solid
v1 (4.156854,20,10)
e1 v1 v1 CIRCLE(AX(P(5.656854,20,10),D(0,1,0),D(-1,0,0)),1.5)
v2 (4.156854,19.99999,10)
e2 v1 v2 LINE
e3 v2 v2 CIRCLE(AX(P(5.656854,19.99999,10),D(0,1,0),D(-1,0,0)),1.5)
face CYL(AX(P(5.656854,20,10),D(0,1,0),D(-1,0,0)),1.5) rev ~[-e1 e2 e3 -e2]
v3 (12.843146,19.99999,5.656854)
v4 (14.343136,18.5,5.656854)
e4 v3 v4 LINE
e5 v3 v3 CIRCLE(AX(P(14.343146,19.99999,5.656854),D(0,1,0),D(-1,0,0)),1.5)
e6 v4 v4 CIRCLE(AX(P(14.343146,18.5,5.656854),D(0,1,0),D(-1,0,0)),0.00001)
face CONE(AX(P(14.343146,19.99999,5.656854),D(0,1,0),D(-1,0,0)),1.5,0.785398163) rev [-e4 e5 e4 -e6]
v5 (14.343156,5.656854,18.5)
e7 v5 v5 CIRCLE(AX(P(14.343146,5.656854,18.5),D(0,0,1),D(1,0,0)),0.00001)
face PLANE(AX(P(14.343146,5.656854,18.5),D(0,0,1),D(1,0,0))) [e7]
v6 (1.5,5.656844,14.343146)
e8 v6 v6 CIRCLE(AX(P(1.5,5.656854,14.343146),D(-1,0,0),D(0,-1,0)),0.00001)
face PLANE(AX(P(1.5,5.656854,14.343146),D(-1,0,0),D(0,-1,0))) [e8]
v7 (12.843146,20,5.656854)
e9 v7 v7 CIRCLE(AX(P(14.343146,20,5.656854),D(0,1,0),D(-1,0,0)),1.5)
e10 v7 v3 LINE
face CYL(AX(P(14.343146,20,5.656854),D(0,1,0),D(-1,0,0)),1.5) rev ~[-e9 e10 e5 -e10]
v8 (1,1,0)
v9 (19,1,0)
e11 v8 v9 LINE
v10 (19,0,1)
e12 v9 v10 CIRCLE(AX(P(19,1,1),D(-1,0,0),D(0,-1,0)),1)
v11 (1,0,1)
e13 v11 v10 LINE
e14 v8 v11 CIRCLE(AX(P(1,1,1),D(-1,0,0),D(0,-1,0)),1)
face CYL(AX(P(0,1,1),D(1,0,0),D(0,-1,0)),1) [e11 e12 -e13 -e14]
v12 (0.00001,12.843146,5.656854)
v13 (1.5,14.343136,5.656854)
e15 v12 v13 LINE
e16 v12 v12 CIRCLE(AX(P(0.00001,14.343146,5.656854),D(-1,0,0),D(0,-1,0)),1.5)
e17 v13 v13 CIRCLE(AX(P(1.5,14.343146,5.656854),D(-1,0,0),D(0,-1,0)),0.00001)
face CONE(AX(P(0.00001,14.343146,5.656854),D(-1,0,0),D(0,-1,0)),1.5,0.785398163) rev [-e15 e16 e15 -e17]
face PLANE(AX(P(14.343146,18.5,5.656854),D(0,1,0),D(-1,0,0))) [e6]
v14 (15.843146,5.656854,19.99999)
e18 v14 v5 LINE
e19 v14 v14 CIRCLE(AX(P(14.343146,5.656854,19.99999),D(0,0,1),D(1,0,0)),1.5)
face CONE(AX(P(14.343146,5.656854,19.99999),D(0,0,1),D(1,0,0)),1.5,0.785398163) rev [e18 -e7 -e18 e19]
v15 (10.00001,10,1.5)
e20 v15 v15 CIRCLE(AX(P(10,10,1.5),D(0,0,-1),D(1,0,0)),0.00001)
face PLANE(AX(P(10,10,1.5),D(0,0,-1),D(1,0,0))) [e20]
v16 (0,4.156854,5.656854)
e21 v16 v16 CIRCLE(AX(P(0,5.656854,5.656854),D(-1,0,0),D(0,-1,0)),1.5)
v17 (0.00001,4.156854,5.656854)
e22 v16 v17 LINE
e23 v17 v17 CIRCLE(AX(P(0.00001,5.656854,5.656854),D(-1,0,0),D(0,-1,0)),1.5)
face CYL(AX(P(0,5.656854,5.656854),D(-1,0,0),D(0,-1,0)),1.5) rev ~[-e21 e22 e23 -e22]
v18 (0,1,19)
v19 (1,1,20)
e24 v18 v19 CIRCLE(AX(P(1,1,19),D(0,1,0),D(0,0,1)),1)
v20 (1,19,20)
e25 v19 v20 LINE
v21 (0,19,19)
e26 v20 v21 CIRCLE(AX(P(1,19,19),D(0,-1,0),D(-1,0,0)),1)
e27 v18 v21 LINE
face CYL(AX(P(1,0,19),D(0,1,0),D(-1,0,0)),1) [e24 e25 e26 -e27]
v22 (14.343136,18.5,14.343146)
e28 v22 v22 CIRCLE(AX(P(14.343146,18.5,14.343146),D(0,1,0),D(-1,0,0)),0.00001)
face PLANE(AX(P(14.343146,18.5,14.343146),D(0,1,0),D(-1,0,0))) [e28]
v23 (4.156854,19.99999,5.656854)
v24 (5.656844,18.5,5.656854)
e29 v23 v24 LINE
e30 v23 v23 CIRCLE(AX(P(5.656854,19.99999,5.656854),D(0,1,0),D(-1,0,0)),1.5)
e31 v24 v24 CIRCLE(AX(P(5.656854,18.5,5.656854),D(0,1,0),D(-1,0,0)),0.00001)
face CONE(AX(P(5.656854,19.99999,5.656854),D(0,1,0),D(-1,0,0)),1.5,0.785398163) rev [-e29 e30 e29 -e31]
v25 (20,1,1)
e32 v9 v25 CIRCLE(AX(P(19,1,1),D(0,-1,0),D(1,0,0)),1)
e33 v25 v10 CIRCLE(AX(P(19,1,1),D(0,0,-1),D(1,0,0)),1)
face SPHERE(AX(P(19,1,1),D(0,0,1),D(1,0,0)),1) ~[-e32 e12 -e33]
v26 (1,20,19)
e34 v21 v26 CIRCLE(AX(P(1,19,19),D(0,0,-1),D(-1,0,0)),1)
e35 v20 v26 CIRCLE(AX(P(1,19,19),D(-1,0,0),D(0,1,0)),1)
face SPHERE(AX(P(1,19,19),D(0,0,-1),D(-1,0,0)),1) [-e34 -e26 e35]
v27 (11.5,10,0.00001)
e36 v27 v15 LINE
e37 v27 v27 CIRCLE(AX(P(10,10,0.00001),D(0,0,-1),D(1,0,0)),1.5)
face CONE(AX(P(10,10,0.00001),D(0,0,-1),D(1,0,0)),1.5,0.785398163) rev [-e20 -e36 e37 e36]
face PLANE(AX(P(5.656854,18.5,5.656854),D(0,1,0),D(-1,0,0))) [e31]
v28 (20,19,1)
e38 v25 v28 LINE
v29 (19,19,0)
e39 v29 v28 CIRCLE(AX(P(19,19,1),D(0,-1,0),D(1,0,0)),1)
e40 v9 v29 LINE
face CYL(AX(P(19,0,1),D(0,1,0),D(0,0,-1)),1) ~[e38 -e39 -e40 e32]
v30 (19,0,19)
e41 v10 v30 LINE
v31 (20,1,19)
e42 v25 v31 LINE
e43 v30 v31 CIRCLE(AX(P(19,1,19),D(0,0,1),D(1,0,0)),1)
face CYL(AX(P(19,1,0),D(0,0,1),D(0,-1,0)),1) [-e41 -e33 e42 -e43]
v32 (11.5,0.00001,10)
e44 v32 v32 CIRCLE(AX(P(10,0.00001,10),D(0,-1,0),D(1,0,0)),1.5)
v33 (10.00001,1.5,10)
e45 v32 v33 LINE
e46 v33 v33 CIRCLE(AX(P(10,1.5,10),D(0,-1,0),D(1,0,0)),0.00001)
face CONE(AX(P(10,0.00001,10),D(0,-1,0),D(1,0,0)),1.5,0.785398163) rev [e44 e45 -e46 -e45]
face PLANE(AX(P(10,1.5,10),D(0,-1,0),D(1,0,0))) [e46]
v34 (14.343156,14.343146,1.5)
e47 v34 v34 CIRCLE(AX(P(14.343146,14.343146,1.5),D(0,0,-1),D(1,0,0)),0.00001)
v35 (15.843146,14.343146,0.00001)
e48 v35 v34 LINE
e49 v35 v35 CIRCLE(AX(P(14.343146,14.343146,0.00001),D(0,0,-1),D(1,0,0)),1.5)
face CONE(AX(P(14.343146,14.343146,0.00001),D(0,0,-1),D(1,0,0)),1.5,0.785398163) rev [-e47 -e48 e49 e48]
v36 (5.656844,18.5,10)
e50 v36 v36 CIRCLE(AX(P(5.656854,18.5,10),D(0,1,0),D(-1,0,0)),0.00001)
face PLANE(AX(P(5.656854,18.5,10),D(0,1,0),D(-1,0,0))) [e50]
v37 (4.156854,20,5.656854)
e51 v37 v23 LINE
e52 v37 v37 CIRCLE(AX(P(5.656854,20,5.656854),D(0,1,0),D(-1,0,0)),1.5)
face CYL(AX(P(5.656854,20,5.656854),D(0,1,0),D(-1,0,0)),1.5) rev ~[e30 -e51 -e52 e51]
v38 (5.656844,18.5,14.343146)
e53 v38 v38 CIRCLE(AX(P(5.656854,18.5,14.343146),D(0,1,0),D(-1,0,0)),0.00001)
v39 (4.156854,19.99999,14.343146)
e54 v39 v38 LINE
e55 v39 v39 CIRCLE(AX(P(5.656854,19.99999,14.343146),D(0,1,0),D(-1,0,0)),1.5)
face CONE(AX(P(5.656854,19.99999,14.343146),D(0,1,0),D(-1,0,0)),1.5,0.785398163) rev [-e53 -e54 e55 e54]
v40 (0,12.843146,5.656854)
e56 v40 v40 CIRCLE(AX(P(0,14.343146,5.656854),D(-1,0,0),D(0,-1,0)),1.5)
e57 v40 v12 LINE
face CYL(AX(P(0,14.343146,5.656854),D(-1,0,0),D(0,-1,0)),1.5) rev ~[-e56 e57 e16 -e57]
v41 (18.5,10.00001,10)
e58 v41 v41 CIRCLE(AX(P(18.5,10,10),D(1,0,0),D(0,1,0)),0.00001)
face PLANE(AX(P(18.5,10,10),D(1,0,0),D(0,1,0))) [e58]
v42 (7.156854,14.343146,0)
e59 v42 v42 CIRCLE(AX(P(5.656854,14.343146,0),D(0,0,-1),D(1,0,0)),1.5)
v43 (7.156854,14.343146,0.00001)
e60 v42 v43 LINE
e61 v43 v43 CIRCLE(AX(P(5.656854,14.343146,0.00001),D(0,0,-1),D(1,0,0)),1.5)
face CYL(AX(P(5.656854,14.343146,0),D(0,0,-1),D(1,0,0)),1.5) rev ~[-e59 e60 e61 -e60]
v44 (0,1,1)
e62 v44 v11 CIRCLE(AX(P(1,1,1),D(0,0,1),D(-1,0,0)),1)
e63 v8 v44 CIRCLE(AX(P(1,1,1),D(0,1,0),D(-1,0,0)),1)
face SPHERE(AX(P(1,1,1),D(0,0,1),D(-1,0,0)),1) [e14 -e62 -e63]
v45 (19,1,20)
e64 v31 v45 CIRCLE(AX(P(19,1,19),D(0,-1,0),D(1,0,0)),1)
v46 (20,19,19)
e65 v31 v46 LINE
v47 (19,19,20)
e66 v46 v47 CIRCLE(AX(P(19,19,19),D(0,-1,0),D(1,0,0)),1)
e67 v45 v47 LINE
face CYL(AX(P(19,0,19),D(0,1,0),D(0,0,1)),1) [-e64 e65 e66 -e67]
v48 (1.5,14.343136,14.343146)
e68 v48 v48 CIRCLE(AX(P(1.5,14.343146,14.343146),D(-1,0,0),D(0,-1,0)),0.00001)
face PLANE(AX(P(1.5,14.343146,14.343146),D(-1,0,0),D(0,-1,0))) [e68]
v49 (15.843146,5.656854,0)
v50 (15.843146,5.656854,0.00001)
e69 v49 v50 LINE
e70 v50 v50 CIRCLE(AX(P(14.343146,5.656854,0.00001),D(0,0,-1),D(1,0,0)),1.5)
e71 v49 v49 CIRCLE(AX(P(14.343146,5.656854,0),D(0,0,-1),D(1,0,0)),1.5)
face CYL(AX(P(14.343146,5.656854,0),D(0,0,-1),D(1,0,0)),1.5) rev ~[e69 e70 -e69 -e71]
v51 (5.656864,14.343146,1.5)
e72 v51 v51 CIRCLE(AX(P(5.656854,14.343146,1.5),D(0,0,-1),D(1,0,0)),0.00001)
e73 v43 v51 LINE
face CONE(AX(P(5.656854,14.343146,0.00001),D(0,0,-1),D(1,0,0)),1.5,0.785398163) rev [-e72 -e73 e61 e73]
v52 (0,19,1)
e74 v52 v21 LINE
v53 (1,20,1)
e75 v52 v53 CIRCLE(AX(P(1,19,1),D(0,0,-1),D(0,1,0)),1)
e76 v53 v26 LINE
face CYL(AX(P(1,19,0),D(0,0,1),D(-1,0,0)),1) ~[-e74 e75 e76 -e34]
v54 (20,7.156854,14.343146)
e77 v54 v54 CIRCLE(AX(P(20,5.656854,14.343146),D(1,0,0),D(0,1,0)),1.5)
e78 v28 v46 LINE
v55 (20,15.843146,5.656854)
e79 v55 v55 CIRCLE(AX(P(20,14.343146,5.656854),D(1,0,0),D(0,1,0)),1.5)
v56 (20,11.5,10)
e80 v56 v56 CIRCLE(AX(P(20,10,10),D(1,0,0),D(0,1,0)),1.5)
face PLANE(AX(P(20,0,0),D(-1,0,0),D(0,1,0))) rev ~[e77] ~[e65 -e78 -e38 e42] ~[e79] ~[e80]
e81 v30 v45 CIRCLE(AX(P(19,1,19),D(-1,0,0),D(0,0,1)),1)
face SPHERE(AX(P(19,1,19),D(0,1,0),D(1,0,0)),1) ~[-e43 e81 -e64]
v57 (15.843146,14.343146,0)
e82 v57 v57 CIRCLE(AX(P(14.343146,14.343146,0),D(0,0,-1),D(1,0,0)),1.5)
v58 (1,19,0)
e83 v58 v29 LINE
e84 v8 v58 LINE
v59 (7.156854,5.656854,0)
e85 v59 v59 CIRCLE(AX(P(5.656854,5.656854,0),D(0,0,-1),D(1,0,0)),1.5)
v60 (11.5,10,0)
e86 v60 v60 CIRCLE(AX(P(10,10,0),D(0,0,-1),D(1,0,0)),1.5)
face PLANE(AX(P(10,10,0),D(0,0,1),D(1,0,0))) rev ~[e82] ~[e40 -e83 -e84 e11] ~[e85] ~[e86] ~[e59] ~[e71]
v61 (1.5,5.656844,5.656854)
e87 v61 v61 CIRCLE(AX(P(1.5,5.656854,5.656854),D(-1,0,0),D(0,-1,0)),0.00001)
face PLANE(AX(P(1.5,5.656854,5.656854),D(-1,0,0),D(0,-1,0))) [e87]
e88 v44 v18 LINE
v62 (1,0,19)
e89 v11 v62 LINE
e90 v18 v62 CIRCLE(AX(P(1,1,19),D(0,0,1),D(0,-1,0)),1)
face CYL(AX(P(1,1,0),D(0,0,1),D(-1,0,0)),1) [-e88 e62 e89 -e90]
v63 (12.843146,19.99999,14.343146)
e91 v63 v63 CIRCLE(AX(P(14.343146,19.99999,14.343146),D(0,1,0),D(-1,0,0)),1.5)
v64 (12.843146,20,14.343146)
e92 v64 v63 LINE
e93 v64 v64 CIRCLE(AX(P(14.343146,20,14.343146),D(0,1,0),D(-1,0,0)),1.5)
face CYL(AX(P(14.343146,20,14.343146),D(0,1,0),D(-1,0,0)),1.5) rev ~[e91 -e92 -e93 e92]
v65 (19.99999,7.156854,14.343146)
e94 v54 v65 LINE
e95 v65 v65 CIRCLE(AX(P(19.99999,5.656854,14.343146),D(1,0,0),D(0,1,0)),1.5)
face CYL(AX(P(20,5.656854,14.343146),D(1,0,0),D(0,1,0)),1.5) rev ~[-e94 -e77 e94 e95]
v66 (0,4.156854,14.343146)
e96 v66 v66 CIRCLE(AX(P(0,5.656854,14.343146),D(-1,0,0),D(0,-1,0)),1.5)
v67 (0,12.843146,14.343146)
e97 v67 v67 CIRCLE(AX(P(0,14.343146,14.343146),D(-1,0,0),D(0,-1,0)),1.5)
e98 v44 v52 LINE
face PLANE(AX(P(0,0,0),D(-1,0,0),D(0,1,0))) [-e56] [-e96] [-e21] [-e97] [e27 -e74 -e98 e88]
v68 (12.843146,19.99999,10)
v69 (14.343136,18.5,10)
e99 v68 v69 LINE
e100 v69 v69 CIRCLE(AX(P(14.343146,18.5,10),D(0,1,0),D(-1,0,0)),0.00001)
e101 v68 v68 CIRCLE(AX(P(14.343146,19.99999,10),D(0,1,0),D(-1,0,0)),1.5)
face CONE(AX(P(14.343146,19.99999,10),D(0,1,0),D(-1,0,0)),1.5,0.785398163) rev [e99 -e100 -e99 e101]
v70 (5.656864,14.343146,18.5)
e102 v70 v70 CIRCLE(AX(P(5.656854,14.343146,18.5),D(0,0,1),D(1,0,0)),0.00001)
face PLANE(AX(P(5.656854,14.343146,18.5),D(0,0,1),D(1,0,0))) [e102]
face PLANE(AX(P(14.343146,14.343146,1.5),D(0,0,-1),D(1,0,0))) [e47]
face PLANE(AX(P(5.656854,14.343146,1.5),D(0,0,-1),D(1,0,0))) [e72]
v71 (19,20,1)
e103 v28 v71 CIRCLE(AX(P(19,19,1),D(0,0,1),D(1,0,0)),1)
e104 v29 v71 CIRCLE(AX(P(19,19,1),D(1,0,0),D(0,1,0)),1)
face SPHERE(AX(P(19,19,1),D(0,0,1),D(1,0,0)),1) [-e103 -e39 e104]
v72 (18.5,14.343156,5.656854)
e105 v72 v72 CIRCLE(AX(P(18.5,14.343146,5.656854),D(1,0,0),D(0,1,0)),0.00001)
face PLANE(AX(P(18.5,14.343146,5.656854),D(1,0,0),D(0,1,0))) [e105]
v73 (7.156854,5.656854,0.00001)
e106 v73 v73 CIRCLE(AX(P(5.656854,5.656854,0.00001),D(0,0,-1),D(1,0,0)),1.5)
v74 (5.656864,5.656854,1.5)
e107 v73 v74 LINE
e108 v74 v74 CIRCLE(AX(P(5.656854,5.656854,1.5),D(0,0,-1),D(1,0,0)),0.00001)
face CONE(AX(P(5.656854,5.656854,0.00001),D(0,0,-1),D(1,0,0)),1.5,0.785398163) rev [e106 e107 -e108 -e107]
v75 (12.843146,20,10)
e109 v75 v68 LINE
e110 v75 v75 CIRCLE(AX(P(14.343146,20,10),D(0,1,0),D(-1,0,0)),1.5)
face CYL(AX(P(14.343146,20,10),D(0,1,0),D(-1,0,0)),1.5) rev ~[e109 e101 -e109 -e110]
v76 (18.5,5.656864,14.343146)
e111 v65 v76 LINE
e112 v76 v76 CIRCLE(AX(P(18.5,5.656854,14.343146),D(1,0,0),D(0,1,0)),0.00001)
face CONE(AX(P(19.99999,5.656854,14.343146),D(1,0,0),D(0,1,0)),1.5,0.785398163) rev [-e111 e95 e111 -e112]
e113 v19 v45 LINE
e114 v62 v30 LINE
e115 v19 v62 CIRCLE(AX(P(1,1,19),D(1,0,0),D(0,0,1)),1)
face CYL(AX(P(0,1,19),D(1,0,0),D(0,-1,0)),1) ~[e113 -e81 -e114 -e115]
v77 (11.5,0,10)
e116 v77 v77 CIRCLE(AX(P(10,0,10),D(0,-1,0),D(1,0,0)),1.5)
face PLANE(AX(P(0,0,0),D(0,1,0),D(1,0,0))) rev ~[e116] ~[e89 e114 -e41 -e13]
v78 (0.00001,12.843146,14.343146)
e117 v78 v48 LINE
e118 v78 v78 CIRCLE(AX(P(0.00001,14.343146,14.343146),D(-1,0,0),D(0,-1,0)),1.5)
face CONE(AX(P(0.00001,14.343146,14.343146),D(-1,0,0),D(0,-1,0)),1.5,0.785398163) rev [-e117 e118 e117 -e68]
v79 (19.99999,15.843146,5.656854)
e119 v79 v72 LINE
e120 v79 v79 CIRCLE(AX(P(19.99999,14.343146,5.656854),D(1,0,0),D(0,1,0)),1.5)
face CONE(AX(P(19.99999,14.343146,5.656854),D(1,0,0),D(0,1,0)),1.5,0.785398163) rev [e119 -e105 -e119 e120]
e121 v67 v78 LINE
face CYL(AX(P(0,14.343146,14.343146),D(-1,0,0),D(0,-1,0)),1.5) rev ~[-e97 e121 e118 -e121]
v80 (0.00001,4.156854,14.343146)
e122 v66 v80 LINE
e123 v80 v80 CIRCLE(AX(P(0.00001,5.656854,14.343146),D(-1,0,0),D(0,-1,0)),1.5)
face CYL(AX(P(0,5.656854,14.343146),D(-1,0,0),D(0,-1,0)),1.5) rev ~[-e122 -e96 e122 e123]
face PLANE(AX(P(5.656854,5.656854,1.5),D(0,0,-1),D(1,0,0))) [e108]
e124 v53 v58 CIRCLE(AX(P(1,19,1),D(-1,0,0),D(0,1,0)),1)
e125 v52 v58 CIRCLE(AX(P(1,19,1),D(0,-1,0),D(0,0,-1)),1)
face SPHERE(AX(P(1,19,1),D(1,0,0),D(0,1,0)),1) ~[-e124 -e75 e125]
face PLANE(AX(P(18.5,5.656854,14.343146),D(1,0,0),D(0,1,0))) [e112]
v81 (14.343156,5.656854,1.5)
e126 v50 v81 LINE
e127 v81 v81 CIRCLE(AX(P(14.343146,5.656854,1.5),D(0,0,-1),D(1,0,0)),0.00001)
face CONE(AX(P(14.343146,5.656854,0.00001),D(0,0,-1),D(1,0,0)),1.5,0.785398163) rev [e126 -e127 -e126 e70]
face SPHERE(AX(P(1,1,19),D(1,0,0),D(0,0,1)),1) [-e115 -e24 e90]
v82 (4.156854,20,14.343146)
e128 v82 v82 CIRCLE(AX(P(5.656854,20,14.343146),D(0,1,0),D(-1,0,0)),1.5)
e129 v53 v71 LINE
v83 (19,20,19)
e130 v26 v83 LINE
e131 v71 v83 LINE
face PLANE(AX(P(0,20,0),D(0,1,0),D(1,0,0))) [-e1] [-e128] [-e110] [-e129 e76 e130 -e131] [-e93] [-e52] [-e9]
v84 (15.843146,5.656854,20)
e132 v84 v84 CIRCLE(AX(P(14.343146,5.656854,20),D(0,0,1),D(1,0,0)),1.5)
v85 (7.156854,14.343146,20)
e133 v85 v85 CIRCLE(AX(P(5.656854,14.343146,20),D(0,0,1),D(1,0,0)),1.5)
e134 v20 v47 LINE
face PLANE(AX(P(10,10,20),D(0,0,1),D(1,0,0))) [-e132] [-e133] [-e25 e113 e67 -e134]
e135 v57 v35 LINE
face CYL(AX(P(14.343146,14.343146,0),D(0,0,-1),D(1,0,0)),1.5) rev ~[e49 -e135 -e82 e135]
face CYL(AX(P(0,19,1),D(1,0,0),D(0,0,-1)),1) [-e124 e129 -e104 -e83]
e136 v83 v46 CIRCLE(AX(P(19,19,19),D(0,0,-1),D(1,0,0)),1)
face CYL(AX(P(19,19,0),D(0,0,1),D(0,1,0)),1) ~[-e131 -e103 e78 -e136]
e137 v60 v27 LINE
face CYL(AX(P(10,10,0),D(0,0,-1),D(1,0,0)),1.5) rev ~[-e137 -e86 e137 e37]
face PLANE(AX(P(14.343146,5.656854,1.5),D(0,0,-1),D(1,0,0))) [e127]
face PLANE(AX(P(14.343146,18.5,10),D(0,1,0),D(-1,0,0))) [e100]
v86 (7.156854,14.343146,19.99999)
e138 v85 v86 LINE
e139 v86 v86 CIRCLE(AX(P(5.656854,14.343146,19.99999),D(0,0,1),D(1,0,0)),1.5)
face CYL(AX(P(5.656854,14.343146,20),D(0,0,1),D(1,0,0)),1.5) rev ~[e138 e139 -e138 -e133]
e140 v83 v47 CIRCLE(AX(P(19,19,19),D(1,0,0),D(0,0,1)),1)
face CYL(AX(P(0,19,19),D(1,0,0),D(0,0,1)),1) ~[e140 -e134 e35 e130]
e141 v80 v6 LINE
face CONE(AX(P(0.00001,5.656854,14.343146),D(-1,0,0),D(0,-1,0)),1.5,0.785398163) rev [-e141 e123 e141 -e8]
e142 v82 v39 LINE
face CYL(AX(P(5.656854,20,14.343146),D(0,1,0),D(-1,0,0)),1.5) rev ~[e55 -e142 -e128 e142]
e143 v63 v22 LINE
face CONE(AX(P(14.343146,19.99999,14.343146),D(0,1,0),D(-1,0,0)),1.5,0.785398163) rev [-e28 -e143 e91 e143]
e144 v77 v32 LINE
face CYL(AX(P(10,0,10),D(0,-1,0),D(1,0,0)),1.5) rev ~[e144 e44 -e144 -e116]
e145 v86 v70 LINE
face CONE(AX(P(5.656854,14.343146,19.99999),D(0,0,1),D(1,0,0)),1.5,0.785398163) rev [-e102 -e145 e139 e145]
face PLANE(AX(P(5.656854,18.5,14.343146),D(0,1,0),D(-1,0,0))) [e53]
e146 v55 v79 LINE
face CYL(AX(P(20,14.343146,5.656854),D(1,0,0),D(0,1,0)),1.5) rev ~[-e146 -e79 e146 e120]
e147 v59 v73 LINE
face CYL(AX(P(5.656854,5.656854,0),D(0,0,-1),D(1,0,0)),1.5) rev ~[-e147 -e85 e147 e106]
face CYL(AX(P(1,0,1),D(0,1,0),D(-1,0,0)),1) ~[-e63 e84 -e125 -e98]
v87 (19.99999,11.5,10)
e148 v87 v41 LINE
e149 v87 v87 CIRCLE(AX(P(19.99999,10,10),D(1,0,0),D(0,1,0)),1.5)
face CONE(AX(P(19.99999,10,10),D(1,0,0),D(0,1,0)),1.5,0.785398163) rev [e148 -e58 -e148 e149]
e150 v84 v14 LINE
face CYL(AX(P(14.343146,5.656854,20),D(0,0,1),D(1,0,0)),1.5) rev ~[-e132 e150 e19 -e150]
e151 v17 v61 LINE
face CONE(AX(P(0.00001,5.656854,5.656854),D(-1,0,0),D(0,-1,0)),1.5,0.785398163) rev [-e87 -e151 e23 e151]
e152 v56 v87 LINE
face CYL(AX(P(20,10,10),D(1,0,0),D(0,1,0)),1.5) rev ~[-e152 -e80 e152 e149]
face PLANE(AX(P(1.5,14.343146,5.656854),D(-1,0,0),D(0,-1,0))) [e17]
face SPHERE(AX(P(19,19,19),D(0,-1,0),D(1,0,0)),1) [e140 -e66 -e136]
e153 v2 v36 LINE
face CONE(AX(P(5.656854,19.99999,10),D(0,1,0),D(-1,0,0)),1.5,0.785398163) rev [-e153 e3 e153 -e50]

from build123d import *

# Parameters (mm, degrees)
F0_W      = 20
F0_H      = 20
F1_DEPTH  = 20
F2_R      = 1.5
F3_DEPTH  = 1.5
F4_R      = 1.5
F5_DEPTH  = 1.5
F6_R      = 1.5
F7_DEPTH  = 1.5
F8_R      = 1.5
F9_DEPTH  = 1.5
F10_R     = 1.5
F11_DEPTH = 1.5
F12_R     = 1.5
F13_DEPTH = 1.5
F14_R     = 1
F15_SIZE  = 1.49999


# Not quite as in the source:
# - a fillet or chamfer is up to 0.001 mm smaller than in the source, because OpenCascade refuses the exact size


with BuildPart() as f1:
    # F0 (on Top) → F1 (new body)
    with BuildSketch(Plane.XY):
        with Locations((10, 10)):
            Rectangle(F0_W, F0_H)
    extrude(amount=F1_DEPTH)

    # F2 (on face) → F3 (cut)
    with BuildSketch(Plane.XZ):
        with Locations((10, 10)):
            Circle(F2_R)
    extrude(amount=-F3_DEPTH, mode=Mode.SUBTRACT)

    # F4 (on face) → F5 (cut)
    with BuildSketch(Plane.XY.offset(20)):
        with Locations((14.3431457505, 5.6568542495)):
            Circle(F4_R)
        with Locations((5.6568542495, 14.3431457505)):
            Circle(F4_R)
    extrude(amount=-F5_DEPTH, mode=Mode.SUBTRACT)

    # F6 (on face) → F7 (cut)
    with BuildSketch(Plane.YZ.offset(20)):
        with Locations((5.6568542495, 14.3431457505)):
            Circle(F6_R)
        with Locations((10, 10)):
            Circle(F6_R)
        with Locations((14.3431457505, 5.6568542495)):
            Circle(F6_R)
    extrude(amount=-F7_DEPTH, mode=Mode.SUBTRACT)

    # F8 (on face) → F9 (cut)
    with BuildSketch(Plane(origin=(0, 20, 0), x_dir=(-1, 0, 0), z_dir=(0, 1, 0))):
        with Locations((-14.3431457505, 10)):
            Circle(F8_R)
        with Locations((-5.6568542495, 5.6568542495)):
            Circle(F8_R)
        with Locations((-14.3431457505, 14.3431457505)):
            Circle(F8_R)
        with Locations((-14.3431457505, 5.6568542495)):
            Circle(F8_R)
        with Locations((-5.6568542495, 14.3431457505)):
            Circle(F8_R)
        with Locations((-5.6568542495, 10)):
            Circle(F8_R)
    extrude(amount=-F9_DEPTH, mode=Mode.SUBTRACT)

    # F10 (on face) → F11 (cut)
    with BuildSketch(Plane(origin=(0, 0, 0), x_dir=(0, -1, 0), z_dir=(-1, 0, 0))):
        with Locations((-14.3431457505, 5.6568542495)):
            Circle(F10_R)
        with Locations((-5.6568542495, 5.6568542495)):
            Circle(F10_R)
        with Locations((-14.3431457505, 14.3431457505)):
            Circle(F10_R)
        with Locations((-5.6568542495, 14.3431457505)):
            Circle(F10_R)
    extrude(amount=-F11_DEPTH, mode=Mode.SUBTRACT)

    # F12 (on face) → F13 (cut)
    with BuildSketch(Plane(origin=(0, 0, 0), x_dir=(1, 0, 0), z_dir=(0, 0, -1))):
        with Locations((14.3431457505, -14.3431457505)):
            Circle(F12_R)
        with Locations((5.6568542495, -5.6568542495)):
            Circle(F12_R)
        with Locations((5.6568542495, -14.3431457505)):
            Circle(F12_R)
        with Locations((14.3431457505, -5.6568542495)):
            Circle(F12_R)
        with Locations((10, -10)):
            Circle(F12_R)
    extrude(amount=-F13_DEPTH, mode=Mode.SUBTRACT)

    # F14
    f14_edges = [f1.edges().sort_by_distance(p)[0] for p in [
        (20, 10, 20),
        (20, 0, 10),
        (10, 0, 20),
        (20, 20, 10),
        (20, 10, 0),
        (10, 20, 0),
        (0, 20, 10),
        (0, 10, 20),
        (10, 20, 20),
        (0, 0, 10),
        (0, 10, 0),
        (10, 0, 0),
    ]]
    fillet(f14_edges, radius=F14_R)

    # F15 (size 1.5 in the source; OpenCascade refuses exactly that, so slightly less here)
    f15_edges = [f1.edges().sort_by_distance(p)[0] for p in [
        (12.843146, 5.656854, 18.5),
        (8.5, 1.5, 10),
        (4.156854, 14.343146, 18.5),
        (15.843146, 18.5, 14.343146),
        (15.843146, 18.5, 10),
        (15.843146, 18.5, 5.656854),
        (7.156854, 18.5, 5.656854),
        (7.156854, 18.5, 10),
        (7.156854, 18.5, 14.343146),
        (18.5, 4.156854, 14.343146),
        (18.5, 8.5, 10),
        (18.5, 12.843146, 5.656854),
        (1.5, 15.843146, 14.343146),
        (1.5, 7.156854, 14.343146),
        (1.5, 7.156854, 5.656854),
        (1.5, 15.843146, 5.656854),
        (4.156854, 5.656854, 1.5),
        (4.156854, 14.343146, 1.5),
        (8.5, 10, 1.5),
        (12.843146, 14.343146, 1.5),
        (12.843146, 5.656854, 1.5),
    ]]
    chamfer(f15_edges, length=F15_SIZE)


solid = f1.part
